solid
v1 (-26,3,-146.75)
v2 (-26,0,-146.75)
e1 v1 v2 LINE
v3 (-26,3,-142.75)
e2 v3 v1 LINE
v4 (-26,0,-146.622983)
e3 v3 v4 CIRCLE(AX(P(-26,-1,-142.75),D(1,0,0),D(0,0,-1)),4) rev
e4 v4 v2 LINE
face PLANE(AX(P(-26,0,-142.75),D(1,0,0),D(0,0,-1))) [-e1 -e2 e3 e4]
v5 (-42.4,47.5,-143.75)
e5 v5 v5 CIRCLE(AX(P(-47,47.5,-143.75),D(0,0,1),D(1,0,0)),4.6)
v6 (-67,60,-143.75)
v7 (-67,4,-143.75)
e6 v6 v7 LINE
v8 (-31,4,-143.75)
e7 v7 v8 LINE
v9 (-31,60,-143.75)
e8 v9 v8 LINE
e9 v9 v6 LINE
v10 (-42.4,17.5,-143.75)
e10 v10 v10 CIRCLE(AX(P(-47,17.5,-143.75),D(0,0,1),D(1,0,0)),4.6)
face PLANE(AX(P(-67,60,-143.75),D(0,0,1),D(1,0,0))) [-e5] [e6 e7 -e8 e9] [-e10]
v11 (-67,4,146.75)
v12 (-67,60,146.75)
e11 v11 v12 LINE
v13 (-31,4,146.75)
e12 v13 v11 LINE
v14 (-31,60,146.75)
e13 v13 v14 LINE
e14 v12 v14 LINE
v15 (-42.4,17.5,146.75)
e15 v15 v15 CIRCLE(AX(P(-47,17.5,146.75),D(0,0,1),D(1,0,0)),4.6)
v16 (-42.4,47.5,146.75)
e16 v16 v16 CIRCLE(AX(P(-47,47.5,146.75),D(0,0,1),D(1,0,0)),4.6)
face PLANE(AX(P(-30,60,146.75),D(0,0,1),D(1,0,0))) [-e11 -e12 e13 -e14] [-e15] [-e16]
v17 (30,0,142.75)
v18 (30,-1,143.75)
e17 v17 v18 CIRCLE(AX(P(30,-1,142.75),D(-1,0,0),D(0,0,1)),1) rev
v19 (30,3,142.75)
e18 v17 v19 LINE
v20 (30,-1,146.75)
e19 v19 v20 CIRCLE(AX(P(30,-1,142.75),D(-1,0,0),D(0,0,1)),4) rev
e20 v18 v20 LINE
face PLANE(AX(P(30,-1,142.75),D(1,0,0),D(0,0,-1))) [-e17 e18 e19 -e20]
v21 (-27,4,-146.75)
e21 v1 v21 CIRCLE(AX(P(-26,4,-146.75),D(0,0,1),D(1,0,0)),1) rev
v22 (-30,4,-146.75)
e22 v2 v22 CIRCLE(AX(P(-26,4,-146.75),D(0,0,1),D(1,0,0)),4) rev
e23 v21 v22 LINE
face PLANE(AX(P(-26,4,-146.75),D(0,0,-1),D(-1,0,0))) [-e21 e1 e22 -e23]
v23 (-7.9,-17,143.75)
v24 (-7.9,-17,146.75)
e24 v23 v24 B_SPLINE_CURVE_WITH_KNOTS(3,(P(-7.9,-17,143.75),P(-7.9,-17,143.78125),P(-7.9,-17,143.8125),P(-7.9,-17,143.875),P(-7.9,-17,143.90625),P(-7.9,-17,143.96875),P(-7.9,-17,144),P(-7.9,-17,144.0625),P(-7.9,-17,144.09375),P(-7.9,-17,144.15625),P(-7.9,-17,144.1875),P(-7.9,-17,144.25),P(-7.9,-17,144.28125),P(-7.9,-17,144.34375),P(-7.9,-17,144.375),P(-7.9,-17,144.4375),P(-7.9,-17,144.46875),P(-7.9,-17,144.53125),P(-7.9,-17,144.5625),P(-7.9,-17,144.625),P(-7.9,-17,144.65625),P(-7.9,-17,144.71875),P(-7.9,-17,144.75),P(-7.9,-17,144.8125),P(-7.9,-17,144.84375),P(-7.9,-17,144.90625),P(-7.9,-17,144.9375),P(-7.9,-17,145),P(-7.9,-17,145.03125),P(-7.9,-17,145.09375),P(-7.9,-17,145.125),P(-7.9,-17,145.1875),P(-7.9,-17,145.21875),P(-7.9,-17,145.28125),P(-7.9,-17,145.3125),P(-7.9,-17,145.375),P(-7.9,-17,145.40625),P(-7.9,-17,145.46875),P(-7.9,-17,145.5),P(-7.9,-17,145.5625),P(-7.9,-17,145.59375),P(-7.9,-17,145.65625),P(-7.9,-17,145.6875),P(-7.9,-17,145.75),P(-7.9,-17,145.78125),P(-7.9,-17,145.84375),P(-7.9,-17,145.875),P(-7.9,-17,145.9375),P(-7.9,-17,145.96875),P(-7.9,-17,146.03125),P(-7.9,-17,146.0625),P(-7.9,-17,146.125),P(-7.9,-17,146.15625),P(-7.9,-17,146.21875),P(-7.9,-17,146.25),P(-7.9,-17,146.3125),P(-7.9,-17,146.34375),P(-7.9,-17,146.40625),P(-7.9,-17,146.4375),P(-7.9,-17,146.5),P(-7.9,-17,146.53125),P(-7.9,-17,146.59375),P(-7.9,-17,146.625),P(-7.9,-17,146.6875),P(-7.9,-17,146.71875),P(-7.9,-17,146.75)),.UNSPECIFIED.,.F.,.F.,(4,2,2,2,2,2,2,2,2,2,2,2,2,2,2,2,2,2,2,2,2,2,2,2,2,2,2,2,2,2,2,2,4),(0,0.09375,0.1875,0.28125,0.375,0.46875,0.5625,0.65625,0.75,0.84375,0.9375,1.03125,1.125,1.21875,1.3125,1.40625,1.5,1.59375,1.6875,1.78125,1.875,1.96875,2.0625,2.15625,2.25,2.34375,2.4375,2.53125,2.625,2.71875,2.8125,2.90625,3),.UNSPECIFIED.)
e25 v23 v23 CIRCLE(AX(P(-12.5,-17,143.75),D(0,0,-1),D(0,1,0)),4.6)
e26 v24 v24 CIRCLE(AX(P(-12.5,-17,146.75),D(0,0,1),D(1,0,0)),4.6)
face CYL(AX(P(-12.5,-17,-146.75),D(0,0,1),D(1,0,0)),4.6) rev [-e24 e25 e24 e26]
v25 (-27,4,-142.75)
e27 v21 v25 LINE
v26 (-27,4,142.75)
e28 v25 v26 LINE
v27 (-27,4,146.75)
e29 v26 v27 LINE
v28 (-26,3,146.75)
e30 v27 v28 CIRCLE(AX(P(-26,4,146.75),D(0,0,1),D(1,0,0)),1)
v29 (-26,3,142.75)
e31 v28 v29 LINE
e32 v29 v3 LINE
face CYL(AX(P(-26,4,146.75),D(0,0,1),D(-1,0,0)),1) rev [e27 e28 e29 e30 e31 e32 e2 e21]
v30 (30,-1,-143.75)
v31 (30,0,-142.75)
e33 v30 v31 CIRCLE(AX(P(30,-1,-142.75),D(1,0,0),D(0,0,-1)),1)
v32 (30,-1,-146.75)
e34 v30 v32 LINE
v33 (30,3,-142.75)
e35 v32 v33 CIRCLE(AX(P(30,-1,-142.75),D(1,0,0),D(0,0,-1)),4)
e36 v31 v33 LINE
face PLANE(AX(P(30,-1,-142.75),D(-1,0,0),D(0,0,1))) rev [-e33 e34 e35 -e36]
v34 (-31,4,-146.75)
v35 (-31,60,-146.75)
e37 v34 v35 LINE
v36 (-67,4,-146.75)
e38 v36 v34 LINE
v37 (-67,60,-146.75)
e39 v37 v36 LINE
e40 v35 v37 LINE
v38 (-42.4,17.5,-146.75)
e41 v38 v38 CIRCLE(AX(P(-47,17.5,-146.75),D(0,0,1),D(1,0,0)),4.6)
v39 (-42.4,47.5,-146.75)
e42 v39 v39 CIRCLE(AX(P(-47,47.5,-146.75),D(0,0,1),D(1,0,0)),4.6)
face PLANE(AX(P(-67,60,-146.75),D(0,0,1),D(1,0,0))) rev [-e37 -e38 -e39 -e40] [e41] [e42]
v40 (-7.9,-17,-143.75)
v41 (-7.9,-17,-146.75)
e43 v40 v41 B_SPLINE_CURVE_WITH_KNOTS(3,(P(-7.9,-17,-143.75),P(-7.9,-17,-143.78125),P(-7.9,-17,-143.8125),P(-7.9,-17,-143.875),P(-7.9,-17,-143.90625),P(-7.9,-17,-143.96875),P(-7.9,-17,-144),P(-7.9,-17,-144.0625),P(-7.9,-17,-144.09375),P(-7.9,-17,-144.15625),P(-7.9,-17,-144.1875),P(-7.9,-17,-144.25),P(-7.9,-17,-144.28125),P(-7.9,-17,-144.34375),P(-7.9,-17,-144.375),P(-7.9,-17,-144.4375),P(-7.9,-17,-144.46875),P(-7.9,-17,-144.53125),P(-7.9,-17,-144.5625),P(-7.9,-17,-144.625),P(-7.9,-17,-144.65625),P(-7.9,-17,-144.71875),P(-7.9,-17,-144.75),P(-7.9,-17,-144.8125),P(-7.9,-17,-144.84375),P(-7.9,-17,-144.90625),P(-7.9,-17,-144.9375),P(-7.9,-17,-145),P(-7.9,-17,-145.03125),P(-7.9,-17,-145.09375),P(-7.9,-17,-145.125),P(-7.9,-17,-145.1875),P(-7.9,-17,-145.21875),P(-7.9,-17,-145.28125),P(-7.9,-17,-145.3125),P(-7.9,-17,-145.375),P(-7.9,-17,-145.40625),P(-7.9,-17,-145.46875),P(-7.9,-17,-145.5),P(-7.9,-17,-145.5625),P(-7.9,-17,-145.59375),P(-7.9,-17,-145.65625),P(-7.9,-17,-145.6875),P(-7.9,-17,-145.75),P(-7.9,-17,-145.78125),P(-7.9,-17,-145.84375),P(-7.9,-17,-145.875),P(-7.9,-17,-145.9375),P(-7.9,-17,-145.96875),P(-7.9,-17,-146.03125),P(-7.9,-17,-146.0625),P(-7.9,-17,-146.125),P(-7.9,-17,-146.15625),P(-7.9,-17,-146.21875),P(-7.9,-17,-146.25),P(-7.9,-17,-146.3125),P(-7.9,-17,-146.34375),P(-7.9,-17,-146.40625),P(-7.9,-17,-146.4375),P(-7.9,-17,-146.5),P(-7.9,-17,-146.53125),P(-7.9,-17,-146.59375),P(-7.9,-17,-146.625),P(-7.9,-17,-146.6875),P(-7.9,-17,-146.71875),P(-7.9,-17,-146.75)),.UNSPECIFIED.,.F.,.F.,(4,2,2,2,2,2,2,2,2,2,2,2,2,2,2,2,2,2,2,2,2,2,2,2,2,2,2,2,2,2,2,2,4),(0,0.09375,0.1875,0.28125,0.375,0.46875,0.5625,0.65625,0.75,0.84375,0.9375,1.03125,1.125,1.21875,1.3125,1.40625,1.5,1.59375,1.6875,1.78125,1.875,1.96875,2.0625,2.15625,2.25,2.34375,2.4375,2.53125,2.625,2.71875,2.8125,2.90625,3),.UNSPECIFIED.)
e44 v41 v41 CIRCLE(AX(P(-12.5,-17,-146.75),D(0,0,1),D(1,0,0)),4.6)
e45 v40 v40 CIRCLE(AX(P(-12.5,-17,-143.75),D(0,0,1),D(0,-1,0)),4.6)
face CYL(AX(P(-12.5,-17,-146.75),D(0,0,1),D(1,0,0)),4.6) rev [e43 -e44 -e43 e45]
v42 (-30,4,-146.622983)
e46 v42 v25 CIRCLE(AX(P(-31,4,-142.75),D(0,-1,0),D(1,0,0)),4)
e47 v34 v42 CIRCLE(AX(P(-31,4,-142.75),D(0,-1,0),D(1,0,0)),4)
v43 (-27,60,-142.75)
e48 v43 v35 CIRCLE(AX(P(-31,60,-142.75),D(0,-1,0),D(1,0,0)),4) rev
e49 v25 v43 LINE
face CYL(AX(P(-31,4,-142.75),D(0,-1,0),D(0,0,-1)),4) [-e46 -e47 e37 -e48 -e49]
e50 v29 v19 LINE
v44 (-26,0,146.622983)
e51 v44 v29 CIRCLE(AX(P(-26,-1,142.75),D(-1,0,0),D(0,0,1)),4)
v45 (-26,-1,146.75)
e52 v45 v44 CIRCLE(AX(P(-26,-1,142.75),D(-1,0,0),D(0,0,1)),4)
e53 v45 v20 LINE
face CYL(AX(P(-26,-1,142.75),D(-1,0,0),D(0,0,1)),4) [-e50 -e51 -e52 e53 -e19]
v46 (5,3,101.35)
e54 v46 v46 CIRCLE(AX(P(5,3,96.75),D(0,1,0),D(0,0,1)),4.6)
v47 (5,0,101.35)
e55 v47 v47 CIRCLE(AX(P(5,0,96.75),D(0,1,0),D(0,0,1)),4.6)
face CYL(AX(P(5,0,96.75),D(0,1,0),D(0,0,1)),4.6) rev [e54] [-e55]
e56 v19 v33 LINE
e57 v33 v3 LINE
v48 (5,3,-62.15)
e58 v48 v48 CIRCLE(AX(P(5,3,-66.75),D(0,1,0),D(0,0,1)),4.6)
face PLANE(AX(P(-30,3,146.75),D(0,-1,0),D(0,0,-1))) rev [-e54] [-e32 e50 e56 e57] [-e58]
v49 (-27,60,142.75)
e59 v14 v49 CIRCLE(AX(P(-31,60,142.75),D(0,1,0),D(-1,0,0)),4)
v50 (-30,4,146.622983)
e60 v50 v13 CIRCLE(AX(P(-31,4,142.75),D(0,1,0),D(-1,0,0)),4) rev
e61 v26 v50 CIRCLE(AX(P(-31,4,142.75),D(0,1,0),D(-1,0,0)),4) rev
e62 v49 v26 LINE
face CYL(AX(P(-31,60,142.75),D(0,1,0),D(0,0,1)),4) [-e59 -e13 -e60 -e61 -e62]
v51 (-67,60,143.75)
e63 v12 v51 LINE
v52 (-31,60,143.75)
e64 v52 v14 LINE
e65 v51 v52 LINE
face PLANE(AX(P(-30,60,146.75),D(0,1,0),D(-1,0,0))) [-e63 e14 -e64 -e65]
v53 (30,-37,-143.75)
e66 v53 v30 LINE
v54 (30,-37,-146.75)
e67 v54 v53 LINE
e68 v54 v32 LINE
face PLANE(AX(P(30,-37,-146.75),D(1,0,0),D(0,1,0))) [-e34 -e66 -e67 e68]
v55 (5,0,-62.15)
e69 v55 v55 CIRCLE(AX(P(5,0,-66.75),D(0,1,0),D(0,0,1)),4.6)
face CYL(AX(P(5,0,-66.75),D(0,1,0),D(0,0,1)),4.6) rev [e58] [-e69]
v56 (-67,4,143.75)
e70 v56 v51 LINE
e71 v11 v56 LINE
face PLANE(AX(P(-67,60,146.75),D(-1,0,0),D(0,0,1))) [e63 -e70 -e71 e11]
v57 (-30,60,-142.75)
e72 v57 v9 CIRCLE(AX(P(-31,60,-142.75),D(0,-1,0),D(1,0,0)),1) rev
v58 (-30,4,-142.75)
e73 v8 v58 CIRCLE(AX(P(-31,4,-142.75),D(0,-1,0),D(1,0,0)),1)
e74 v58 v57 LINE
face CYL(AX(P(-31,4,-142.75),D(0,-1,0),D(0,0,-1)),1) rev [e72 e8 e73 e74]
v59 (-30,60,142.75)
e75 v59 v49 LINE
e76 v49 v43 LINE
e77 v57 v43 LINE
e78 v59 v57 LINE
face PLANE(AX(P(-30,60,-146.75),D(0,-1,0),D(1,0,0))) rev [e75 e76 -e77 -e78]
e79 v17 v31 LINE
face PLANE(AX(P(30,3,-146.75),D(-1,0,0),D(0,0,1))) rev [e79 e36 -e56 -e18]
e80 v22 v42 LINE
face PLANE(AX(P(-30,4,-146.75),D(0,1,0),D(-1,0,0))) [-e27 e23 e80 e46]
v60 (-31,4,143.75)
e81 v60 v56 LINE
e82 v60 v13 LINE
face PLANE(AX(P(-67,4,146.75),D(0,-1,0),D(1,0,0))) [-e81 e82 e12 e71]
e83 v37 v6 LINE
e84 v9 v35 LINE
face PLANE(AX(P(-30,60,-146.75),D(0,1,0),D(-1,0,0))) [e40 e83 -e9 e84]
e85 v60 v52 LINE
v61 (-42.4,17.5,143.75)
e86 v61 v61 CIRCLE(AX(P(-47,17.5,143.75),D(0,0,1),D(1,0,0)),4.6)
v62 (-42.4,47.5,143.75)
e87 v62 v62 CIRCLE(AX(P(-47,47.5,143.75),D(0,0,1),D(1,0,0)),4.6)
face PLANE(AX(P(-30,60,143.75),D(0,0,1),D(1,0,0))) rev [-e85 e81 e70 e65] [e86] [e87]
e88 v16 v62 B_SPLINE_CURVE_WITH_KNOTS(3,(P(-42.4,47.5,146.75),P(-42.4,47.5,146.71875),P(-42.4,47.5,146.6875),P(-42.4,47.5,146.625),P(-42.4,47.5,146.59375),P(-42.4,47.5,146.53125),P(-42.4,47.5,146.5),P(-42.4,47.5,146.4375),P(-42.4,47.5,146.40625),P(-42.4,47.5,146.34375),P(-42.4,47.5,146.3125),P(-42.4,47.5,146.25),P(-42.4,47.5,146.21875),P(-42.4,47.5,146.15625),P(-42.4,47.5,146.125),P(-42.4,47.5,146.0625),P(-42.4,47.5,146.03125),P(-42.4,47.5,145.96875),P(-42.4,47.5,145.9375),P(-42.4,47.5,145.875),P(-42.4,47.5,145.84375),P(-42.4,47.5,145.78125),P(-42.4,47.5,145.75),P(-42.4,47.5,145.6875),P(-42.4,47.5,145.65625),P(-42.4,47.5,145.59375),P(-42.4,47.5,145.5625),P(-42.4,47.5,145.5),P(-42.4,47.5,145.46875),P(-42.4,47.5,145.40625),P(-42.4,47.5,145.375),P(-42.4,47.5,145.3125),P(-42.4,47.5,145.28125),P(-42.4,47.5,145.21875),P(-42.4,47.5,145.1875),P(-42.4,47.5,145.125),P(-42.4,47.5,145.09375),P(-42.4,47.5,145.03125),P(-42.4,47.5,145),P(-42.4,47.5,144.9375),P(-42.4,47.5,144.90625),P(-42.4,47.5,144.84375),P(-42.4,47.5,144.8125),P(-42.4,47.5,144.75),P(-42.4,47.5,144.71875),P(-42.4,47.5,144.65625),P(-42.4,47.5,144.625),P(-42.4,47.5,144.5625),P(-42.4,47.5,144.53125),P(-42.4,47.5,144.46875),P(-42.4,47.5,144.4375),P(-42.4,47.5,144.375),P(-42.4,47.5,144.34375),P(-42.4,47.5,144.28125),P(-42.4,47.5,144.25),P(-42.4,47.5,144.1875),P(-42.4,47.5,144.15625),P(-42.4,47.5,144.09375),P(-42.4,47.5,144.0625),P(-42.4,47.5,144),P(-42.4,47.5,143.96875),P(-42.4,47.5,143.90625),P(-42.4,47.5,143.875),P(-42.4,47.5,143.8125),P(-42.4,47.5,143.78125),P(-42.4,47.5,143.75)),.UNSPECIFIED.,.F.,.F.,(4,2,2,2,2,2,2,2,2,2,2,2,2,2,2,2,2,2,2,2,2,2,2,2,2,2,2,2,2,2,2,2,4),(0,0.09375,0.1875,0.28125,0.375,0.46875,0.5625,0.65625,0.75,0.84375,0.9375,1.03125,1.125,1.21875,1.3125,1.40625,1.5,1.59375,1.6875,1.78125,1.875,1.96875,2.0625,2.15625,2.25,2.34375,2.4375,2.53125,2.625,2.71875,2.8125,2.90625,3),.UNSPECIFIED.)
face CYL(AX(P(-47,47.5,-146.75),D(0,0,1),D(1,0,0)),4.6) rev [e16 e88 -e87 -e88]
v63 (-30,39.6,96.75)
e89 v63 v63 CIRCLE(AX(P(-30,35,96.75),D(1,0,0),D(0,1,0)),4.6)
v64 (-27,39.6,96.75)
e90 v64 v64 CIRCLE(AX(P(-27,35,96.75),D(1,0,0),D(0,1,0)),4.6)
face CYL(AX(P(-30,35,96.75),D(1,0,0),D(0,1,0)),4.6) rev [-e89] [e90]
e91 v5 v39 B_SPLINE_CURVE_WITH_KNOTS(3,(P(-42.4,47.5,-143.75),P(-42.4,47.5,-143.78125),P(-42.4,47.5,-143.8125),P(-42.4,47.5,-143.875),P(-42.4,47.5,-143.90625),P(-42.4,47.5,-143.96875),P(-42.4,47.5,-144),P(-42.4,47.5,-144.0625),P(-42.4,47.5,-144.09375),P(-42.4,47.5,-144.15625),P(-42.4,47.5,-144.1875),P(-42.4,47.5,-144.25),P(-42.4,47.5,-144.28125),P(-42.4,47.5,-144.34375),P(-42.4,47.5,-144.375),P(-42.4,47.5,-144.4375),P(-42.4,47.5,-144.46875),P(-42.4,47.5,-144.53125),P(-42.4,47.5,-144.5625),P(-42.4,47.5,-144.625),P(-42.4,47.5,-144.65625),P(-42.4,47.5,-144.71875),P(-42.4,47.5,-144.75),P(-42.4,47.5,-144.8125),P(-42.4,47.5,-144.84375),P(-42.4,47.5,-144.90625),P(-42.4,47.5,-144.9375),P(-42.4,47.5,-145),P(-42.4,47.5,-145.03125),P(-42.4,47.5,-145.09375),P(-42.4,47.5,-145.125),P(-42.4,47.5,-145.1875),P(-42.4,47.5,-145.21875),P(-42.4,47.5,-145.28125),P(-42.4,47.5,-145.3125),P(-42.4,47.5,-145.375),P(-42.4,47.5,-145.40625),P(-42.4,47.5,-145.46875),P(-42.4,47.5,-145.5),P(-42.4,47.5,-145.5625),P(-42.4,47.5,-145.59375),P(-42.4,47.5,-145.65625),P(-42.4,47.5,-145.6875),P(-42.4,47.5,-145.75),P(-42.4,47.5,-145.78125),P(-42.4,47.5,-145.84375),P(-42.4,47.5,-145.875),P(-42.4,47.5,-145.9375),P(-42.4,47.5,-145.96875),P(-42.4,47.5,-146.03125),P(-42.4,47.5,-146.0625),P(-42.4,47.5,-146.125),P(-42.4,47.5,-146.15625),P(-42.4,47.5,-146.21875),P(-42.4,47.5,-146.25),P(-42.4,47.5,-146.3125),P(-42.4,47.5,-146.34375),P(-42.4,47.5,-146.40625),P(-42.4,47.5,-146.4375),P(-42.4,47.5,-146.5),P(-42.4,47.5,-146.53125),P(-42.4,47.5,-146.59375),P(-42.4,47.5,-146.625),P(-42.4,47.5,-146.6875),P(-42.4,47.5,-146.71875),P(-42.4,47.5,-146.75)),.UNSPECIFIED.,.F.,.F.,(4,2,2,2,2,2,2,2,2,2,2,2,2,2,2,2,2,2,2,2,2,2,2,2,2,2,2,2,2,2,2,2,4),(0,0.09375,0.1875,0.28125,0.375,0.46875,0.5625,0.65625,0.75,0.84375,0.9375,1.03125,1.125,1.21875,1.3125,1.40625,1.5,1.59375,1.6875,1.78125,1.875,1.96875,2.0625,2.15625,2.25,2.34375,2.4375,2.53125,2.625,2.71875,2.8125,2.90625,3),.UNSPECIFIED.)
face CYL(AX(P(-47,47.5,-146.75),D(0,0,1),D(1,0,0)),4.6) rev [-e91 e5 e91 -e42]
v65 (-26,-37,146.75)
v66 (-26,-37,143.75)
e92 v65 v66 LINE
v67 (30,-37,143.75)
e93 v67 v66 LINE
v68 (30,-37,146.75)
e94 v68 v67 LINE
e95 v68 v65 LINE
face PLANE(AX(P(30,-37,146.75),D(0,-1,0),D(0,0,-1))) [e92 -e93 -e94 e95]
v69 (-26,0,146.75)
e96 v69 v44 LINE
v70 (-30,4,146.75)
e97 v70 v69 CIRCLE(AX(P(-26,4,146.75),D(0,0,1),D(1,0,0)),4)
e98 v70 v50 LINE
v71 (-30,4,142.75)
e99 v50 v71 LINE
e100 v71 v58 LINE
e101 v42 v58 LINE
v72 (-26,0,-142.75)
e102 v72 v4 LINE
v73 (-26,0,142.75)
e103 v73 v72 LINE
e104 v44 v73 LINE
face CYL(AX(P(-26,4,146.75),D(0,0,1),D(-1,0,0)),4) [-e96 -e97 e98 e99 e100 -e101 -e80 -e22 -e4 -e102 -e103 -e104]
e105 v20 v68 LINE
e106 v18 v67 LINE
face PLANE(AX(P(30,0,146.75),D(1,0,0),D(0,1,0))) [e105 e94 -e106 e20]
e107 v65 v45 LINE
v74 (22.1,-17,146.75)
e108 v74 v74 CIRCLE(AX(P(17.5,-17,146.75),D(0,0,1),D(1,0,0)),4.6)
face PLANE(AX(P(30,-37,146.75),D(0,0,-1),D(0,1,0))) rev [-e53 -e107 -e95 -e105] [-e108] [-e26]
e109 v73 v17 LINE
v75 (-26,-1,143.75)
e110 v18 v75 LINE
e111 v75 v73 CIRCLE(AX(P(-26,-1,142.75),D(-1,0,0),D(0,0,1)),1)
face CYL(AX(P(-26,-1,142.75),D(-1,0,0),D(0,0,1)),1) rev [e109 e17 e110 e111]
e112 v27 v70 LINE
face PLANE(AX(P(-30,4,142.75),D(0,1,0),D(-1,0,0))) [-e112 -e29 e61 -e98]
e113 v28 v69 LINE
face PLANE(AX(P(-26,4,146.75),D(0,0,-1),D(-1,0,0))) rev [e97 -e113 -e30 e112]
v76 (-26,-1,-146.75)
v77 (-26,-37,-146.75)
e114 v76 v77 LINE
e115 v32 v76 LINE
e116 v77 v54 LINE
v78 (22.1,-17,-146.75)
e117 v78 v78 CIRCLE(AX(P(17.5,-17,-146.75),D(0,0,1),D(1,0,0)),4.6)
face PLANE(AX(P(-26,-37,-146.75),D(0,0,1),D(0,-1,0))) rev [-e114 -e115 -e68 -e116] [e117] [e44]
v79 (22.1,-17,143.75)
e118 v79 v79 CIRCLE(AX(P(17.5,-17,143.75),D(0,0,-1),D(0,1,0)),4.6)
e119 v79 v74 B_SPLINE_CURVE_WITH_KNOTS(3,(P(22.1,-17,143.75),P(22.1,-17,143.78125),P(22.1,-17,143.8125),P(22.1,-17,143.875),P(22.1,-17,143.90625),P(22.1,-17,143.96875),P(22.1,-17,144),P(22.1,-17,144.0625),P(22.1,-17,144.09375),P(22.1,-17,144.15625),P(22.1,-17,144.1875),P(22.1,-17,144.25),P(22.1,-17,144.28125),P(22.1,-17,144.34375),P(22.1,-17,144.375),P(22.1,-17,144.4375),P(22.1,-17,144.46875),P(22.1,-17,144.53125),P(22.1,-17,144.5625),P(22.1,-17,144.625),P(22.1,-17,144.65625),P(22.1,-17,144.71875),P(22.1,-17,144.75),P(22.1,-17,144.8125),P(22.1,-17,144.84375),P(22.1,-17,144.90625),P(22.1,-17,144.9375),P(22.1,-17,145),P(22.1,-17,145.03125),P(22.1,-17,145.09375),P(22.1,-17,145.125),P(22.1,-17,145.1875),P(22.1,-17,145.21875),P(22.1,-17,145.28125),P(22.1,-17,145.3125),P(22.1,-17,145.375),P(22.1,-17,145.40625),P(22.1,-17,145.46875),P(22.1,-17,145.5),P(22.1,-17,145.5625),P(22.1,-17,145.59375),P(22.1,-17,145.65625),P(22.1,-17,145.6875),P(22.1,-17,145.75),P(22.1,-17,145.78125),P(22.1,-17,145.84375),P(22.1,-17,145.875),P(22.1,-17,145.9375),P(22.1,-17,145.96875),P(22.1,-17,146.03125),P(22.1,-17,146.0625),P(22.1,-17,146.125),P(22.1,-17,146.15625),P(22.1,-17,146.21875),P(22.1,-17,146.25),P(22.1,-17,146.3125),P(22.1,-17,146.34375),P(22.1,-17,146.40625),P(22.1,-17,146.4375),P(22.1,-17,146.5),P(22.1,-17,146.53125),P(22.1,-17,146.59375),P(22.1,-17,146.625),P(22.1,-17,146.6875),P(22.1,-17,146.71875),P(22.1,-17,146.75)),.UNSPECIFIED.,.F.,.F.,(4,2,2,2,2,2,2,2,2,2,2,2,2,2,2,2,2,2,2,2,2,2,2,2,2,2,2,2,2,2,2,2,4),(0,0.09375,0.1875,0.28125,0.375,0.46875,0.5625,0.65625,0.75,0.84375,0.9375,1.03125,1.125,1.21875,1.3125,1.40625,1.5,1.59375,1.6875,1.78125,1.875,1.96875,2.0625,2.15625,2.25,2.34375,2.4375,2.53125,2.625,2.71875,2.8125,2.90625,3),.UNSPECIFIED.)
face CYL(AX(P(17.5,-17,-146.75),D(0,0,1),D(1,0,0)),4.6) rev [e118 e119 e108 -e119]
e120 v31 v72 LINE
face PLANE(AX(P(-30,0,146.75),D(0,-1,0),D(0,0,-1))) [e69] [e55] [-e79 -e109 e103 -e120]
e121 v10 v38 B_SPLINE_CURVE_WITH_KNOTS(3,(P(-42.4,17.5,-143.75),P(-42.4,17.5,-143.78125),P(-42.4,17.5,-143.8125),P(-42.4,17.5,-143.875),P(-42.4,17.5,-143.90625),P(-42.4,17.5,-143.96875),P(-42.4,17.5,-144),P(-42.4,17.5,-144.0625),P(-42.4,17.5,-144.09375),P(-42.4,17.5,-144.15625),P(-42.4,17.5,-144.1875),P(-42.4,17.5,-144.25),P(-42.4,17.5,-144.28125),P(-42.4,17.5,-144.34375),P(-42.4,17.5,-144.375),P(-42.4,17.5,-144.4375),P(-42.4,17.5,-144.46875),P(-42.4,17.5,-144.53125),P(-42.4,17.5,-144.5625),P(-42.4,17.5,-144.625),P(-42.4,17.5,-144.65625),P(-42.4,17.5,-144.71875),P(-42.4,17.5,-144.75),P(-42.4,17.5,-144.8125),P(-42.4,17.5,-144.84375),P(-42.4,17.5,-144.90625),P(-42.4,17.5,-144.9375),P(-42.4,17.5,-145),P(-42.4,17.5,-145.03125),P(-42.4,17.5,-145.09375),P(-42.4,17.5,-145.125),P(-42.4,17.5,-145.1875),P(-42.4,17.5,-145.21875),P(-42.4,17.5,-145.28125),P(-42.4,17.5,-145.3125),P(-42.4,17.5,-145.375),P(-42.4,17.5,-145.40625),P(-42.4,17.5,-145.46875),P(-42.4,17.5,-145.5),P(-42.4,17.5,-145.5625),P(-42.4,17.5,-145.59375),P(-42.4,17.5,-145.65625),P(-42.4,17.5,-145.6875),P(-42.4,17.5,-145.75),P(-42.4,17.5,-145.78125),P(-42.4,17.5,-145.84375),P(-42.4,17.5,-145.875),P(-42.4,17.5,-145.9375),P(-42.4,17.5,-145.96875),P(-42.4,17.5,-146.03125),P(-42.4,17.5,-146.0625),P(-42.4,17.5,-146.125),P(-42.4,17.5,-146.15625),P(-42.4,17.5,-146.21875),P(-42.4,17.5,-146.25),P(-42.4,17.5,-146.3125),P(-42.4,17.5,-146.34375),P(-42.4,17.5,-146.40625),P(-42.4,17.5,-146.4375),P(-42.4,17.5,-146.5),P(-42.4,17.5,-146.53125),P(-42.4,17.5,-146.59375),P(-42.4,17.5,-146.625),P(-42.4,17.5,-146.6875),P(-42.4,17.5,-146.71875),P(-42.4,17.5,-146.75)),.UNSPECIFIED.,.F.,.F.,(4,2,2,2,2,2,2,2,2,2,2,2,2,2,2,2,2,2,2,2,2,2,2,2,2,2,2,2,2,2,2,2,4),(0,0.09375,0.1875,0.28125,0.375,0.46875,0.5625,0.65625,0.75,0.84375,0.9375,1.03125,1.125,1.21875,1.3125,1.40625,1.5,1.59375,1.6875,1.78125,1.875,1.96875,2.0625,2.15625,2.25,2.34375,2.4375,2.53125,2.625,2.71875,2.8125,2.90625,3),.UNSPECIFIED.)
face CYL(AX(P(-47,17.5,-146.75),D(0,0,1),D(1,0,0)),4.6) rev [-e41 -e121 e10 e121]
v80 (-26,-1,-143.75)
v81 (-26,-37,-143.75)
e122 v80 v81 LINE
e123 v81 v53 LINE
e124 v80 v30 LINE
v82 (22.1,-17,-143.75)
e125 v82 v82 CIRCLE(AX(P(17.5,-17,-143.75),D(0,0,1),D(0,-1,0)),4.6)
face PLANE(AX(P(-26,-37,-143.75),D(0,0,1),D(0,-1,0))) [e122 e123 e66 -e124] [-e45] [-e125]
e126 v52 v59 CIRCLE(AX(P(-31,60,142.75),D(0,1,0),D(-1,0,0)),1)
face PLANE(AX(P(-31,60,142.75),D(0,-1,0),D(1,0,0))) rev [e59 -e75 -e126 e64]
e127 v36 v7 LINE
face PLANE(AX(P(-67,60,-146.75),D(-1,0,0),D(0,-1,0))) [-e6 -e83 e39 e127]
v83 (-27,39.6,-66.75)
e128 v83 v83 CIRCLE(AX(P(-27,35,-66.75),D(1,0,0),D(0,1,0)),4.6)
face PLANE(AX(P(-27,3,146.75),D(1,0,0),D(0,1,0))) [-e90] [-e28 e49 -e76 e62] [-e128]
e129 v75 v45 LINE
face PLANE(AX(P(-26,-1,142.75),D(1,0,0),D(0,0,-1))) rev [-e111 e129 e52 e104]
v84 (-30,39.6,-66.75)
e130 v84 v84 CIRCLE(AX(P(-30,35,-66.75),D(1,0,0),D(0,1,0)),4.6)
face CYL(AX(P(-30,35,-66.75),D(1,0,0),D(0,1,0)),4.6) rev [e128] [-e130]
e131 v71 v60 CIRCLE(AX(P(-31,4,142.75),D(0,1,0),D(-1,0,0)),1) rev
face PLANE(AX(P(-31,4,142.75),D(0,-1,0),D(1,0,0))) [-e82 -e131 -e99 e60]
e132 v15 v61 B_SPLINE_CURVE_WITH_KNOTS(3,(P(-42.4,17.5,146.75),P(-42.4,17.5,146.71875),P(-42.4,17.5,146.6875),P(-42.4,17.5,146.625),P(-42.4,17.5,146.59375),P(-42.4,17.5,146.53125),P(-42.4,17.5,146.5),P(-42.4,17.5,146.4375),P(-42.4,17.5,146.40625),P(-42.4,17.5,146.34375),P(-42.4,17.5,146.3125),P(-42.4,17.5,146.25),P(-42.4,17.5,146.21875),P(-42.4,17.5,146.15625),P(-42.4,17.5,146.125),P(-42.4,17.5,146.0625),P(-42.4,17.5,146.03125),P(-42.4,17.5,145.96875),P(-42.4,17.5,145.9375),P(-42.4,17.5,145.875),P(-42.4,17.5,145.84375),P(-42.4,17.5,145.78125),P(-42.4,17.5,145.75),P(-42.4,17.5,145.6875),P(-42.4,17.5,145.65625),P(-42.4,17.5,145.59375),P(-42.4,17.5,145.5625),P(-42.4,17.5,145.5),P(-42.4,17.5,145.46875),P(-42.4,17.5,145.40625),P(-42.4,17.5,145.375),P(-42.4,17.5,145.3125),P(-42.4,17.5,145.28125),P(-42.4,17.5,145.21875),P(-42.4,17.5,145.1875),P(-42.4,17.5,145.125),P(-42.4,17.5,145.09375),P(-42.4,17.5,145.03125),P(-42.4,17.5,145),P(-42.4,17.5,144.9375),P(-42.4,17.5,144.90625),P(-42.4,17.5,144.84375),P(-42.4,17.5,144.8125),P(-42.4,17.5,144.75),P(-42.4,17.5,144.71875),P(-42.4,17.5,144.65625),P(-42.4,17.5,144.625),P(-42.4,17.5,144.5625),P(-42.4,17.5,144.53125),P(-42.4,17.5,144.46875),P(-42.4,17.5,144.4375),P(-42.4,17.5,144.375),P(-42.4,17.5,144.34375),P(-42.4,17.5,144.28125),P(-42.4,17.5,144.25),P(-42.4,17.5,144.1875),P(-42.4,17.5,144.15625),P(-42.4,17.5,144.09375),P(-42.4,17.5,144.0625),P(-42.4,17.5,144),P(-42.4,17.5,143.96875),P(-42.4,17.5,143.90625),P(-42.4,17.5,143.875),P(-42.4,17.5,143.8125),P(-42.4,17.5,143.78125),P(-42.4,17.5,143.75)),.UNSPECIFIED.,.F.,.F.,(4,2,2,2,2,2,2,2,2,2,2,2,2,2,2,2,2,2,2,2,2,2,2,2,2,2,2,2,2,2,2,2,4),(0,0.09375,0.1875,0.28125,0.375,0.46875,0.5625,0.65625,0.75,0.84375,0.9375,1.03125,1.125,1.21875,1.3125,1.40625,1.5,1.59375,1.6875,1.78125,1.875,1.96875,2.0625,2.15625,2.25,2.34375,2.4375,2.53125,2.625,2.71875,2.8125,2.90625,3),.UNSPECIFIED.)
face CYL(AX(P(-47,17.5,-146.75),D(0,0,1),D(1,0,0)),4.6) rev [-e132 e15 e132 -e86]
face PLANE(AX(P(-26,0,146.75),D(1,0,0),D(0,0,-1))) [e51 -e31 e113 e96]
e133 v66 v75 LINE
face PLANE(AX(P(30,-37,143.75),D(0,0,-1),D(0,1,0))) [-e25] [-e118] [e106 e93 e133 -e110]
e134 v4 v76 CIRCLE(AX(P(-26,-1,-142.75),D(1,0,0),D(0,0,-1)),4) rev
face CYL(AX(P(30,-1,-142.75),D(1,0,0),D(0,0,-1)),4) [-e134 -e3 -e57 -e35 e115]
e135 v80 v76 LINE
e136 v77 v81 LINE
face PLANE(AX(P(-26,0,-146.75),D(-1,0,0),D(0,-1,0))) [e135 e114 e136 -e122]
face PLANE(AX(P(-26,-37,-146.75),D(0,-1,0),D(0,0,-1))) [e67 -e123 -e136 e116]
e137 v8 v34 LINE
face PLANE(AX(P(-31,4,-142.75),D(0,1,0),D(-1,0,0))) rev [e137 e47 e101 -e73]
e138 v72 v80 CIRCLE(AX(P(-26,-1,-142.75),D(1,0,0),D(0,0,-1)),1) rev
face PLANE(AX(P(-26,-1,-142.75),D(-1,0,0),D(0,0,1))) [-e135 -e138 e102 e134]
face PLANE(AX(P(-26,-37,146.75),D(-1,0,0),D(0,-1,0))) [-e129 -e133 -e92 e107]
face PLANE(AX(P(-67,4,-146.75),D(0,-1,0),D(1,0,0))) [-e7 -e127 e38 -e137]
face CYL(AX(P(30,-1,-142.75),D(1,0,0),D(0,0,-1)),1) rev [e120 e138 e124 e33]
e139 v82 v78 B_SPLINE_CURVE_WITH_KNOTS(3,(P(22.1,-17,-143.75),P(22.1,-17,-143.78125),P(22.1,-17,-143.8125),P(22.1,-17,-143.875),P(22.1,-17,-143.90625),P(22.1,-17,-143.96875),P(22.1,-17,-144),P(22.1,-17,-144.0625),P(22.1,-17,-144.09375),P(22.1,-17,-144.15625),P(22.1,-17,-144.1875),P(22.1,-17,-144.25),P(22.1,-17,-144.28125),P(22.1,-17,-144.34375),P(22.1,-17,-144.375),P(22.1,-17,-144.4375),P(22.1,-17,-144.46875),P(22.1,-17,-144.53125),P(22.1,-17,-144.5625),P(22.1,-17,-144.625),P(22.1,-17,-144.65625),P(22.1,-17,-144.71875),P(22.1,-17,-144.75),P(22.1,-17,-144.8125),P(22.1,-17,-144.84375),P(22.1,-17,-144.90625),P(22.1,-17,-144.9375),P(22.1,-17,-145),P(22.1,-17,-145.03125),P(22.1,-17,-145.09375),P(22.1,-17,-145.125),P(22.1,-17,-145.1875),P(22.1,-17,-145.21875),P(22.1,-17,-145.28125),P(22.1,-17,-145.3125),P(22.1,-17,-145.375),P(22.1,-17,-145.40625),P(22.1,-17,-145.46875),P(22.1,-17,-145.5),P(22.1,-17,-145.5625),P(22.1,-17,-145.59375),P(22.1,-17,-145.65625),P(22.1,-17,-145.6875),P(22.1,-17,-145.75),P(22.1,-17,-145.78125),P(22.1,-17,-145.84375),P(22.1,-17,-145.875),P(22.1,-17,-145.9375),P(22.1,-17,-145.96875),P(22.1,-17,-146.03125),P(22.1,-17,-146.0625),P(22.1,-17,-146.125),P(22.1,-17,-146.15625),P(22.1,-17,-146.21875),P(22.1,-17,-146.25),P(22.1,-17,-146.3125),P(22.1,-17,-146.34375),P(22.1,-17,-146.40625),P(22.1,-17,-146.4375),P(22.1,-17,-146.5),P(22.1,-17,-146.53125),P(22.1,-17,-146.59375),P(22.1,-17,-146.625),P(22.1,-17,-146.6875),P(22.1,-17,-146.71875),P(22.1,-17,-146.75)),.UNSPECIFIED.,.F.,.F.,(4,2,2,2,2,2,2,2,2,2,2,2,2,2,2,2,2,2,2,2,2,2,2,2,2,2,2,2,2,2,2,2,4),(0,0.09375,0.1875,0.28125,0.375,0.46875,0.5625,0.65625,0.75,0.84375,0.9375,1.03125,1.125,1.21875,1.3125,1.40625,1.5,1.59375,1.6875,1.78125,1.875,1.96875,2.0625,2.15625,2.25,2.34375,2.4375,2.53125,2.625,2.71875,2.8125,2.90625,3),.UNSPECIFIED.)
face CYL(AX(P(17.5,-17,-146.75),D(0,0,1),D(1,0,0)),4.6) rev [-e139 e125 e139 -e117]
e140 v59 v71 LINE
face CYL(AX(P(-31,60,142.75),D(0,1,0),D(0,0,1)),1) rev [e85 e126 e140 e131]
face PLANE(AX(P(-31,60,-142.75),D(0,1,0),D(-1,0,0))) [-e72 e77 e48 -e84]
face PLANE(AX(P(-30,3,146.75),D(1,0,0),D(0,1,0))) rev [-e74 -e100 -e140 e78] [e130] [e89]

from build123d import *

# Parameters (mm, degrees)
SKETCH1_W                      = 60
SKETCH1_H                      = 293.5
BASE_FLANGE1_DEPTH             = 3
EDGE_FLANGE1_STRIP_W           = 14
EDGE_FLANGE1_STRIP_H           = 3
EDGE_FLANGE1_STRIP_CUT_DEPTH   = 293.5
EDGE_FLANGE1_DEPTH             = 293.5
EDGE_FLANGE2_STRIP_W           = 14
EDGE_FLANGE2_STRIP_H           = 3
EDGE_FLANGE2_STRIP_CUT_DEPTH   = 56
EDGE_FLANGE2_STRIP_2_W         = 14
EDGE_FLANGE2_STRIP_2_H         = 3
EDGE_FLANGE2_STRIP_CUT_2_DEPTH = 56
EDGE_FLANGE2_STRIP_3_W         = 14
EDGE_FLANGE2_STRIP_3_H         = 3
EDGE_FLANGE2_STRIP_CUT_3_DEPTH = 56
EDGE_FLANGE2_STRIP_4_W         = 14
EDGE_FLANGE2_STRIP_4_H         = 3
EDGE_FLANGE2_STRIP_CUT_4_DEPTH = 56
EDGE_FLANGE2_DEPTH             = 56
EDGE_FLANGE2_BEND_DEPTH        = 56
EDGE_FLANGE2_BEND_2_DEPTH      = 56
EDGE_FLANGE2_BEND_3_DEPTH      = 56
SKETCH18_R                     = 4.6
EXTRUDE1_DEPTH                 = 307.971089844
SKETCH19_R                     = 4.6
EXTRUDE2_DEPTH                 = 3
SKETCH20_R                     = 4.6
EXTRUDE3_DEPTH                 = 3


# Sheet-metal steps are written as plain solids
with BuildPart() as part:
    # Sketch1 → Base-Flange1 (new body)
    with BuildSketch(Plane(origin=(0, 0, 0), x_dir=(1, 0, 0), z_dir=(0, 1, 0))):
        Rectangle(SKETCH1_W, SKETCH1_H)
    extrude(amount=BASE_FLANGE1_DEPTH)

    # Edge-Flange1 strip (across the edge) → Edge-Flange1 strip cut (cut)
    with BuildSketch(Plane(origin=(-30, 3, -146.75), x_dir=(1, 0, 0), z_dir=(0, 0, 1))):
        with Locations((-3, -1.5)):
            Rectangle(EDGE_FLANGE1_STRIP_W, EDGE_FLANGE1_STRIP_H)
    extrude(amount=EDGE_FLANGE1_STRIP_CUT_DEPTH, mode=Mode.SUBTRACT)

    # Edge-Flange1 section (across the edge) → Edge-Flange1 (add)
    with BuildSketch(Plane(origin=(-30, 3, -146.75), x_dir=(1, 0, 0), z_dir=(0, 0, 1))):
        with BuildLine():
            Line((0, 1), (0, 57))
            Line((0, 57), (3, 57))
            Line((3, 57), (3, 1))
            ThreePointArc((3, 1), (3.292893219, 0.292893219), (4, 0))
            Line((4, 0), (4, -3))
            ThreePointArc((4, -3), (1.171572875, -1.828427125), (0, 1))
        make_face()
    extrude(amount=EDGE_FLANGE1_DEPTH)

    # Edge-Flange2 strip (across the edge) → Edge-Flange2 strip cut (cut)
    with BuildSketch(Plane(origin=(-30, 4, 146.75), x_dir=(0, 0, -1), z_dir=(0, 1, 0))):
        with Locations((-3, -1.5)):
            Rectangle(EDGE_FLANGE2_STRIP_W, EDGE_FLANGE2_STRIP_H)
    extrude(amount=EDGE_FLANGE2_STRIP_CUT_DEPTH, mode=Mode.SUBTRACT)

    # Edge-Flange2 strip 2 (across the edge) → Edge-Flange2 strip cut 2 (cut)
    with BuildSketch(Plane(origin=(30, 0, 146.75), x_dir=(0, 0, -1), z_dir=(-1, 0, 0))):
        with Locations((-3, -1.5)):
            Rectangle(EDGE_FLANGE2_STRIP_2_W, EDGE_FLANGE2_STRIP_2_H)
    extrude(amount=EDGE_FLANGE2_STRIP_CUT_2_DEPTH, mode=Mode.SUBTRACT)

    # Edge-Flange2 strip 3 (across the edge) → Edge-Flange2 strip cut 3 (cut)
    with BuildSketch(Plane(origin=(-30, 60, -146.75), x_dir=(0, 0, 1), z_dir=(0, -1, 0))):
        with Locations((-3, -1.5)):
            Rectangle(EDGE_FLANGE2_STRIP_3_W, EDGE_FLANGE2_STRIP_3_H)
    extrude(amount=EDGE_FLANGE2_STRIP_CUT_3_DEPTH, mode=Mode.SUBTRACT)

    # Edge-Flange2 strip 4 (across the edge) → Edge-Flange2 strip cut 4 (cut)
    with BuildSketch(Plane(origin=(-26, 0, -146.75), x_dir=(0, 0, 1), z_dir=(1, 0, 0))):
        with Locations((-3, -1.5)):
            Rectangle(EDGE_FLANGE2_STRIP_4_W, EDGE_FLANGE2_STRIP_4_H)
    extrude(amount=EDGE_FLANGE2_STRIP_CUT_4_DEPTH, mode=Mode.SUBTRACT)

    # Edge-Flange2 section (across the edge) → Edge-Flange2 (add)
    with BuildSketch(Plane(origin=(-30, 4, 146.75), x_dir=(0, 0, -1), z_dir=(0, 1, 0))):
        with BuildLine():
            Line((0, 1), (0, 37))
            Line((0, 37), (3, 37))
            Line((3, 37), (3, 1))
            ThreePointArc((3, 1), (3.292893219, 0.292893219), (4, 0))
            Line((4, 0), (4, -3))
            ThreePointArc((4, -3), (1.171572875, -1.828427125), (0, 1))
        make_face()
    extrude(amount=EDGE_FLANGE2_DEPTH)

    # Edge-Flange2 section 2 (across the edge) → Edge-Flange2 bend (add)
    with BuildSketch(Plane(origin=(30, 0, 146.75), x_dir=(0, 0, -1), z_dir=(-1, 0, 0))):
        with BuildLine():
            Line((0, 1), (0, 37))
            Line((0, 37), (3, 37))
            Line((3, 37), (3, 1))
            ThreePointArc((3, 1), (3.292893219, 0.292893219), (4, 0))
            Line((4, 0), (4, -3))
            ThreePointArc((4, -3), (1.171572875, -1.828427125), (0, 1))
        make_face()
    extrude(amount=EDGE_FLANGE2_BEND_DEPTH)

    # Edge-Flange2 section 3 (across the edge) → Edge-Flange2 bend 2 (add)
    with BuildSketch(Plane(origin=(-30, 60, -146.75), x_dir=(0, 0, 1), z_dir=(0, -1, 0))):
        with BuildLine():
            Line((0, 1), (0, 37))
            Line((0, 37), (3, 37))
            Line((3, 37), (3, 1))
            ThreePointArc((3, 1), (3.292893219, 0.292893219), (4, 0))
            Line((4, 0), (4, -3))
            ThreePointArc((4, -3), (1.171572875, -1.828427125), (0, 1))
        make_face()
    extrude(amount=EDGE_FLANGE2_BEND_2_DEPTH)

    # Edge-Flange2 section 4 (across the edge) → Edge-Flange2 bend 3 (add)
    with BuildSketch(Plane(origin=(-26, 0, -146.75), x_dir=(0, 0, 1), z_dir=(1, 0, 0))):
        with BuildLine():
            Line((0, 1), (0, 37))
            Line((0, 37), (3, 37))
            Line((3, 37), (3, 1))
            ThreePointArc((3, 1), (3.292893219, 0.292893219), (4, 0))
            Line((4, 0), (4, -3))
            ThreePointArc((4, -3), (1.171572875, -1.828427125), (0, 1))
        make_face()
    extrude(amount=EDGE_FLANGE2_BEND_3_DEPTH)

    # Sketch18 → Extrude1 (cut, through all)
    with BuildSketch(Plane.XY.offset(146.75)):
        with Locations((-47, 47.5)):
            Circle(SKETCH18_R)
        with Locations((-47, 17.5)):
            Circle(SKETCH18_R)
        with Locations((-12.5, -17)):
            Circle(SKETCH18_R)
        with Locations((17.5, -17)):
            Circle(SKETCH18_R)
    extrude(amount=-EXTRUDE1_DEPTH, mode=Mode.SUBTRACT)

    # Sketch19 → Extrude2 (cut)
    with BuildSketch(Plane(origin=(-27, 0, 0), x_dir=(0, 0, -1), z_dir=(1, 0, 0))):
        with Locations(Location((-96.75, 35, 0), (0, 0, 90))):
            Circle(SKETCH19_R)
        with Locations(Location((66.75, 35, 0), (0, 0, 90))):
            Circle(SKETCH19_R)
    extrude(amount=-EXTRUDE2_DEPTH, mode=Mode.SUBTRACT)

    # Sketch20 → Extrude3 (cut)
    with BuildSketch(Plane(origin=(0, 3, 0), x_dir=(1, 0, 0), z_dir=(0, 1, 0))):
        with Locations(Location((5, 66.75, 0), (0, 0, 270))):
            Circle(SKETCH20_R)
        with Locations(Location((5, -96.75, 0), (0, 0, 270))):
            Circle(SKETCH20_R)
    extrude(amount=-EXTRUDE3_DEPTH, mode=Mode.SUBTRACT)


solid = part.part
